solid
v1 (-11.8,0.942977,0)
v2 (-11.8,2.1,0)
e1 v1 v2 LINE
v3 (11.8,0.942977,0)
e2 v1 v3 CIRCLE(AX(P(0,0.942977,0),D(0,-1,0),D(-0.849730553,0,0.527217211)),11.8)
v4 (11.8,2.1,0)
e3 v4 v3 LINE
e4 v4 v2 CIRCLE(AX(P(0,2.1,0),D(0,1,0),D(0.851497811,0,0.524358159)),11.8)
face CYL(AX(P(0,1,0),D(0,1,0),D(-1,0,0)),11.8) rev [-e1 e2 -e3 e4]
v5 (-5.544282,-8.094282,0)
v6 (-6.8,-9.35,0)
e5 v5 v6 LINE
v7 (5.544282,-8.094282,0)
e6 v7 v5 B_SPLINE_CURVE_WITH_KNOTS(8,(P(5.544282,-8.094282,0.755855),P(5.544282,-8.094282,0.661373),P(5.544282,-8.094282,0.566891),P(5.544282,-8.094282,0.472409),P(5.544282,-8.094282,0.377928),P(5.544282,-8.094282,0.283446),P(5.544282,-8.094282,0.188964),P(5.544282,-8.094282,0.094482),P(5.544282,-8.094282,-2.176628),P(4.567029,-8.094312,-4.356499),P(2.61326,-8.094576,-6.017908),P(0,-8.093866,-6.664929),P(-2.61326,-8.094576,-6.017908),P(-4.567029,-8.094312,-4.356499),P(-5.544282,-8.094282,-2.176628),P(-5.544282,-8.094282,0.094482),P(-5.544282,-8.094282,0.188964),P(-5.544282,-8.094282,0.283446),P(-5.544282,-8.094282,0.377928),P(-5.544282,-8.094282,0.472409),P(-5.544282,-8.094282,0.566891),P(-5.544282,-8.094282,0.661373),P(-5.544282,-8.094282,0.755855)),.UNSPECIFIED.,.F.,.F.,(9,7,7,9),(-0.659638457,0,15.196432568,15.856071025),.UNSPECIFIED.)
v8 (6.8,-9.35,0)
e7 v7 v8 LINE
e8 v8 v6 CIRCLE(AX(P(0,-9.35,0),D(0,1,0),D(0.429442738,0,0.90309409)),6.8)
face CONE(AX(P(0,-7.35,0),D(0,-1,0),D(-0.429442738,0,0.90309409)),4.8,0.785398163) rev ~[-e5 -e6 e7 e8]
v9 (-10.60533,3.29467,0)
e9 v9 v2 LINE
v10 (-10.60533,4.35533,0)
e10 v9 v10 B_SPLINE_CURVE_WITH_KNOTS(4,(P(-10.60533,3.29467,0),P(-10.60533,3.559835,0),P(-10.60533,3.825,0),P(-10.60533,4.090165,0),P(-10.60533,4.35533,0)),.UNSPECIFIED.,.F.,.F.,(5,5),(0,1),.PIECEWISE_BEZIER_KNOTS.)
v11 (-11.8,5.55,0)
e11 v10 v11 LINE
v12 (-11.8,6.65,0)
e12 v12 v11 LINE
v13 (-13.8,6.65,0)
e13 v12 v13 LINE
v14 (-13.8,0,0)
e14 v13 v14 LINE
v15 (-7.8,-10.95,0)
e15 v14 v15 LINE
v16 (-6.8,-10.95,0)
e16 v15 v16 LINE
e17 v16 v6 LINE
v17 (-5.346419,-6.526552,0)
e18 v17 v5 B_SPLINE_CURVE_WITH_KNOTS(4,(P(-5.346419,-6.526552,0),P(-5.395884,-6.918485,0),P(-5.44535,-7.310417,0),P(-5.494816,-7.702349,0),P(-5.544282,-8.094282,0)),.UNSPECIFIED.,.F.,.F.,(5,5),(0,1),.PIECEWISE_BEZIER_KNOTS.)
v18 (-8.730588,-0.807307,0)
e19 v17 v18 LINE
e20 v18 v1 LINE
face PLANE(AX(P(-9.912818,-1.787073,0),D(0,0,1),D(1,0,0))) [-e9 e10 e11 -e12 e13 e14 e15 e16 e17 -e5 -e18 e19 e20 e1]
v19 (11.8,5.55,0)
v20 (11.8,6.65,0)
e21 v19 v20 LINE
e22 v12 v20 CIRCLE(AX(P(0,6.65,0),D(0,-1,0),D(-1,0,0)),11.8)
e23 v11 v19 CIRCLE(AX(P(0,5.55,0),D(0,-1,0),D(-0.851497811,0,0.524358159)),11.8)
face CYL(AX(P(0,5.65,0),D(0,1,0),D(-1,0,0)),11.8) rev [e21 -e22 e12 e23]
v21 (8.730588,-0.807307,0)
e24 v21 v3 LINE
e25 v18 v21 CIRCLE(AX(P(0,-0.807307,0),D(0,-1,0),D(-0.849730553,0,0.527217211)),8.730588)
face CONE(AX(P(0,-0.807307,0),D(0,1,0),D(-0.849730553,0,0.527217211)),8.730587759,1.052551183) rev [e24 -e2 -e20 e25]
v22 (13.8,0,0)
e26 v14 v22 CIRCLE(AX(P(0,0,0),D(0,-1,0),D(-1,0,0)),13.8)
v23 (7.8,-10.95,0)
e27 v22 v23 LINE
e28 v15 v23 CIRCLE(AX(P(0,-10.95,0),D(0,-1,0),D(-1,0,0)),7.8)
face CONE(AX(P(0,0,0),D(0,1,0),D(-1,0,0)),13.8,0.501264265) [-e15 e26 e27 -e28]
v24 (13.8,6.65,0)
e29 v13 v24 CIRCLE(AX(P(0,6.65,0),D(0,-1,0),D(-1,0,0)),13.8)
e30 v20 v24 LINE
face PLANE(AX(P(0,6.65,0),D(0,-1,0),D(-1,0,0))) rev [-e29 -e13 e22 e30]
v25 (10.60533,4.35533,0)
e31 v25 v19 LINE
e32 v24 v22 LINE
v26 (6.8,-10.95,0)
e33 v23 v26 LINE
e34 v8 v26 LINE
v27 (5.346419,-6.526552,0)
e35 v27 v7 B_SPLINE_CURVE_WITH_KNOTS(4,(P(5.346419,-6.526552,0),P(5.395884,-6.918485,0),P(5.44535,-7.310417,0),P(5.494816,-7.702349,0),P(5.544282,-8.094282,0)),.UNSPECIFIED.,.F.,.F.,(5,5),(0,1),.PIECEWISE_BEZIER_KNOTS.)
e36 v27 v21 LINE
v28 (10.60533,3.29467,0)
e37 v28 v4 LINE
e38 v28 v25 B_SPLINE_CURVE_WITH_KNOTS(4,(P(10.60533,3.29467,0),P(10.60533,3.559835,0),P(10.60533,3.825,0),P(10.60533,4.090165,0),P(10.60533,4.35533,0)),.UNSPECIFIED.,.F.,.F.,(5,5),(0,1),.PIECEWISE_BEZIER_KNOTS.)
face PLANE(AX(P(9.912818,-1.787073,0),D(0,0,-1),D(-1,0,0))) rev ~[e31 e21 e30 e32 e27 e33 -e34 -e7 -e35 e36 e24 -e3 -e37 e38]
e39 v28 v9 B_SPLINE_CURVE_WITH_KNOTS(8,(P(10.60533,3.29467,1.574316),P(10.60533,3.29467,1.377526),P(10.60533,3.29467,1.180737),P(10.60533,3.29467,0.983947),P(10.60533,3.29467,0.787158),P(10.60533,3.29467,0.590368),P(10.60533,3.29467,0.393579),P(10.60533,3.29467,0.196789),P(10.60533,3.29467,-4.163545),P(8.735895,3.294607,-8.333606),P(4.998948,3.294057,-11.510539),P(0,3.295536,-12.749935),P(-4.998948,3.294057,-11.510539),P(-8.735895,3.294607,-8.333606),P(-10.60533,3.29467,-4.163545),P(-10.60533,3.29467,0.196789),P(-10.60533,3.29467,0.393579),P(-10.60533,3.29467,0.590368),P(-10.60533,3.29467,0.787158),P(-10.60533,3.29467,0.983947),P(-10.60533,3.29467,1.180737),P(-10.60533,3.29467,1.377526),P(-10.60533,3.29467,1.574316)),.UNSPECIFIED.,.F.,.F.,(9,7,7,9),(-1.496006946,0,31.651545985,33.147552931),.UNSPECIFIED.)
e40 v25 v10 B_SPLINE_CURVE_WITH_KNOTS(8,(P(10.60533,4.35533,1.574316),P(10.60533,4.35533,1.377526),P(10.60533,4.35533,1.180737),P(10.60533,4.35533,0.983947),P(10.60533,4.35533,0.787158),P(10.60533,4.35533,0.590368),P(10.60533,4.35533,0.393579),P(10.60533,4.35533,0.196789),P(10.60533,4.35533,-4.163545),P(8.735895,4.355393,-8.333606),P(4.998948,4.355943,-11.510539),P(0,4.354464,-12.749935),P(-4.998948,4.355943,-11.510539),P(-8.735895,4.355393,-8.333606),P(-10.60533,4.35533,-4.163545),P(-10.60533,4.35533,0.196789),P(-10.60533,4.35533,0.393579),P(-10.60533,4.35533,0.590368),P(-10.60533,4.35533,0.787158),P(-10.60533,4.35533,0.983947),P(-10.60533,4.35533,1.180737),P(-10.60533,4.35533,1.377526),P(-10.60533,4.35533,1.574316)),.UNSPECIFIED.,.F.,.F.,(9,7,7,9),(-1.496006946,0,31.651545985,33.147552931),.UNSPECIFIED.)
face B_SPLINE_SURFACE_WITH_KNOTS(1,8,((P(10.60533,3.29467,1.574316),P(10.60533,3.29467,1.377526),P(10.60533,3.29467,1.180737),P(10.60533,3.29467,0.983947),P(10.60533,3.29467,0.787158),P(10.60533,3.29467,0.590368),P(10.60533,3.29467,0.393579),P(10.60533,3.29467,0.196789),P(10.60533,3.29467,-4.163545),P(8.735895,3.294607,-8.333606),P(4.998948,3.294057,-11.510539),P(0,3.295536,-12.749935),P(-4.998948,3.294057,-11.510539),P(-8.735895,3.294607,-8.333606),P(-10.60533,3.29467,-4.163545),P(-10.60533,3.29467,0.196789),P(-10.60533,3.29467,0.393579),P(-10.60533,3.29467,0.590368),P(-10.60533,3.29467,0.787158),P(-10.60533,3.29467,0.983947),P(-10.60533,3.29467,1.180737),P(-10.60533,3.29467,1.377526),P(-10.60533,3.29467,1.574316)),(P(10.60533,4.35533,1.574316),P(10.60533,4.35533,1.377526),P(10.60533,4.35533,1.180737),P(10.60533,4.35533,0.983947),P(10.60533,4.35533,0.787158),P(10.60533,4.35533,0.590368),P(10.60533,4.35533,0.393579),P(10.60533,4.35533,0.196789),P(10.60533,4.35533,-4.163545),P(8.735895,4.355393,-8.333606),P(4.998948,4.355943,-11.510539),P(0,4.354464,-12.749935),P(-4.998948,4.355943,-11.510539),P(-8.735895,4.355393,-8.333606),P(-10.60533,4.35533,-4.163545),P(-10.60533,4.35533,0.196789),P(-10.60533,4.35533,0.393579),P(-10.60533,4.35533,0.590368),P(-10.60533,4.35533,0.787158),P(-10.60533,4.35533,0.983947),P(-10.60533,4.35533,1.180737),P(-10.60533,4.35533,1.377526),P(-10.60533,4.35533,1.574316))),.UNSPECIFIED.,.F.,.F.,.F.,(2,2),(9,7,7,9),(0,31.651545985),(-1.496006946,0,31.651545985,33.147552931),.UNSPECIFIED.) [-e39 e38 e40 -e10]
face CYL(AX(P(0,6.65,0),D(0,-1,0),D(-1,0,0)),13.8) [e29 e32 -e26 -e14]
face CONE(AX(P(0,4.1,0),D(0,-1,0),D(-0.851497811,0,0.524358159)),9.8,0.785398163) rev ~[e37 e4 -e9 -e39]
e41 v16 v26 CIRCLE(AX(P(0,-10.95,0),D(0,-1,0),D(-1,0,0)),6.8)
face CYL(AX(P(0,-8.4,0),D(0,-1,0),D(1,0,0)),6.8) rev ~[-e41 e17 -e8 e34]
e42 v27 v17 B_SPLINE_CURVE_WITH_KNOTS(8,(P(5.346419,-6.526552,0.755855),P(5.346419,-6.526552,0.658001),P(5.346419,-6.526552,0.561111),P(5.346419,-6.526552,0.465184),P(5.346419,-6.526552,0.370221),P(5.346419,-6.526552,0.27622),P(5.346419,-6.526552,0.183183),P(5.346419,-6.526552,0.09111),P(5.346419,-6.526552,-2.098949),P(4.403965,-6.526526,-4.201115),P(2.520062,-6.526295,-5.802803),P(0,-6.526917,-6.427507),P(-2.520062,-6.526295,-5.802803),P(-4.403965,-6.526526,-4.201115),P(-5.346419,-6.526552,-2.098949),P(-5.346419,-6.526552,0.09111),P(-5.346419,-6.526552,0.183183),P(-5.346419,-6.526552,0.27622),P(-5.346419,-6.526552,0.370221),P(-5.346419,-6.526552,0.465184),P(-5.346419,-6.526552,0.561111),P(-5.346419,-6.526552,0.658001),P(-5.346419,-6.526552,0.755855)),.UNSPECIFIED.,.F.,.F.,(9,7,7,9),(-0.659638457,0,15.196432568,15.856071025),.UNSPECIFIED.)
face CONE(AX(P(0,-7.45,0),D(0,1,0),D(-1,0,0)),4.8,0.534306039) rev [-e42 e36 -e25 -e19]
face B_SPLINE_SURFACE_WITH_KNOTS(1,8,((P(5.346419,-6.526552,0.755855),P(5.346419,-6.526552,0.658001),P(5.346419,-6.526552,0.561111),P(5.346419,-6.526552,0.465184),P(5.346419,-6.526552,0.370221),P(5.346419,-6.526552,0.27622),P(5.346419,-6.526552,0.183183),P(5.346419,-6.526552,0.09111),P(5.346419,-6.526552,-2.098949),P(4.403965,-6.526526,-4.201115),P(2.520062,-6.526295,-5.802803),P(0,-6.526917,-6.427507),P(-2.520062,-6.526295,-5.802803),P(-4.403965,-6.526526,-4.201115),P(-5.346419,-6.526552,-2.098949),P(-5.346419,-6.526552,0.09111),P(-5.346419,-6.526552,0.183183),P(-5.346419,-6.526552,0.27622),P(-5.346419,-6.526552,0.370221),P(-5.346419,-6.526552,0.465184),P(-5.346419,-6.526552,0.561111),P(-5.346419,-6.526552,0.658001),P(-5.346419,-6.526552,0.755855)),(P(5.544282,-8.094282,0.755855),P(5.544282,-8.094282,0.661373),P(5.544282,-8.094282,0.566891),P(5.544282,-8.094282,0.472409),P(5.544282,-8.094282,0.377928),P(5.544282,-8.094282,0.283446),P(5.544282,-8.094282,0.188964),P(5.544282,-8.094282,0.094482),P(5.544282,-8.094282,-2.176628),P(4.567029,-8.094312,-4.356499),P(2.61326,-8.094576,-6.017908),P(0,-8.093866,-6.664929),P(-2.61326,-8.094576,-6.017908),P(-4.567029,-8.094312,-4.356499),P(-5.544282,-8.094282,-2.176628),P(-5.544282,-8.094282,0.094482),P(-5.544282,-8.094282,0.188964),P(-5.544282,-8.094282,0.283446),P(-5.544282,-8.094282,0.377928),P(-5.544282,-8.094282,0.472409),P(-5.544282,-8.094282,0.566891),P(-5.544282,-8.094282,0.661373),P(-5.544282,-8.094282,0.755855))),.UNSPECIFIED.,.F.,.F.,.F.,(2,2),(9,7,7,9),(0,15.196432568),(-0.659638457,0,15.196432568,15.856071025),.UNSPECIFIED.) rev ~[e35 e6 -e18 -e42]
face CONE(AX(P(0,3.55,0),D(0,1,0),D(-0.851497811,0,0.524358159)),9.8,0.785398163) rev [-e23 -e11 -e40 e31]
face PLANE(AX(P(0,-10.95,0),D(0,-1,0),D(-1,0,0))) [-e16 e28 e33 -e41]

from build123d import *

# Parameters (mm, degrees)
F1_ANGLE     = 180
F2_T4_ANGLE  = 243.2500896942
F2_S5_R      = 11.8
F2_T6_DEPTH  = 16
F3_T4_ANGLE  = 243.6352501502
F3_S5_R      = 11.8
F3_T6_DEPTH  = 16
F4_T4_ANGLE  = 309.1355997924
F4_S5_R      = 6.8
F4_T6_DEPTH  = 11
F4_T10_ANGLE = 243.2500896942
F4_S11_R     = 11.8
F4_T12_DEPTH = 16
F5_SIZE      = 0.75
F6_SIZE      = 1


# Not quite as in the source:
# - a fillet or chamfer that OpenCascade refuses, or shapes differently, is made with other operations: its cross-section is extruded or revolved along the edge and cut away or added
# - a feature names something its author has since deleted; it is built from what else it names


with BuildPart() as f1:
    # F0 (on Top) → F1 (revolve)
    with BuildSketch(Plane.XY):
        Polygon((-11.8, 5.65), (-11.8, 6.65), (-13.8, 6.65), (-13.8, 0), (-7.8, -10.95), (-6.8, -10.95), (-6.8, -9.45), (-4.8, -9.45), (-4.8, -7.45), (-9.8, 1), (-11.8, 1), (-11.8, 2), (-9.8, 2), (-9.8, 5.65), align=None)
    revolve(axis=Axis((0, 0, 0), (0, -1, 0)), revolution_arc=F1_ANGLE)

    # F2: chamfer of 2.1 on 1 edges, made by hand


with BuildPart() as f2_tool2:
    # F2_s3 → F2_t4 (revolve)
    with BuildSketch(Plane(origin=(0, 0, 0), x_dir=(0, 1, 0), z_dir=(0.5243581586, 0, 0.8514978107))):
        Polygon((3.55, 9.8), (5.65, 11.9), (5.65, 9.8), align=None)
    revolve(axis=Axis((0, 5.65, 0), (0, -1, 0)), revolution_arc=F2_T4_ANGLE)

    # F2_s5 → F2_t6 (intersect, symmetric)
    with BuildSketch(Plane.XZ.offset(-4.6)):
        Circle(F2_S5_R)
    extrude(amount=F2_T6_DEPTH, both=True, mode=Mode.INTERSECT)


with BuildPart() as f1_1:
    add(f1.part)

    # F2_t1: cut F2_tool2
    add(f2_tool2.part, mode=Mode.SUBTRACT)

    # F3: chamfer of 2.1 on 1 edges, made by hand


with BuildPart() as f3_tool2:
    # F3_s3 → F3_t4 (revolve)
    with BuildSketch(Plane(origin=(0, 0, 0), x_dir=(0, 1, 0), z_dir=(0.5272172108, 0, 0.849730553))):
        Polygon((-0.8073066866, 8.7305877594), (1, 11.9), (1, 9.8), align=None)
    revolve(axis=Axis((0, 1, 0), (0, -1, 0)), revolution_arc=F3_T4_ANGLE)

    # F3_s5 → F3_t6 (intersect, symmetric)
    with BuildSketch(Plane.XZ.offset(-0.1)):
        Circle(F3_S5_R)
    extrude(amount=F3_T6_DEPTH, both=True, mode=Mode.INTERSECT)


with BuildPart() as f1_2:
    add(f1_1.part)

    # F3_t1: cut F3_tool2
    add(f3_tool2.part, mode=Mode.SUBTRACT)

    # F4: chamfer of 2.1 on 2 edges, made by hand


with BuildPart() as f4_tool2:
    # F4_s3 → F4_t4 (revolve)
    with BuildSketch(Plane(origin=(0, 0, 0), x_dir=(0, 1, 0), z_dir=(0.9030940896, 0, 0.4294427381))):
        Polygon((-7.35, 4.8), (-9.45, 6.9), (-9.45, 4.8), align=None)
    revolve(axis=Axis((0, -9.45, 0), (0, -1, 0)), revolution_arc=F4_T4_ANGLE)

    # F4_s5 → F4_t6 (intersect, symmetric)
    with BuildSketch(Plane.XZ.offset(8.4)):
        Circle(F4_S5_R)
    extrude(amount=F4_T6_DEPTH, both=True, mode=Mode.INTERSECT)


with BuildPart() as f1_3:
    add(f1_2.part)

    # F4_t1: cut F4_tool2
    add(f4_tool2.part, mode=Mode.SUBTRACT)


with BuildPart() as f4_tool8:
    # F4_s9 → F4_t10 (revolve)
    with BuildSketch(Plane(origin=(0, 0, 0), x_dir=(0, 1, 0), z_dir=(0.5243581586, 0, 0.8514978107))):
        Polygon((4.1, 9.8), (2, 11.9), (2, 9.8), align=None)
    revolve(axis=Axis((0, 2, 0), (0, -1, 0)), revolution_arc=F4_T10_ANGLE)

    # F4_s11 → F4_t12 (intersect, symmetric)
    with BuildSketch(Plane.XZ.offset(-3)):
        Circle(F4_S11_R)
    extrude(amount=F4_T12_DEPTH, both=True, mode=Mode.INTERSECT)


with BuildPart() as f1_4:
    add(f1_3.part)

    # F4_t7: cut F4_tool8
    add(f4_tool8.part, mode=Mode.SUBTRACT)

    # F5
    f5_edges = [f1_4.edges().sort_by_distance(p)[0] for p in [
        (0, 3.825, -10.075),
    ]]
    chamfer(f5_edges, length=F5_SIZE)

    # F6
    f6_edges = [f1_4.edges().sort_by_distance(p)[0] for p in [
        (0, -7.387175, -4.837175),
    ]]
    chamfer(f6_edges, length=F6_SIZE)


solid = f1_4.part
